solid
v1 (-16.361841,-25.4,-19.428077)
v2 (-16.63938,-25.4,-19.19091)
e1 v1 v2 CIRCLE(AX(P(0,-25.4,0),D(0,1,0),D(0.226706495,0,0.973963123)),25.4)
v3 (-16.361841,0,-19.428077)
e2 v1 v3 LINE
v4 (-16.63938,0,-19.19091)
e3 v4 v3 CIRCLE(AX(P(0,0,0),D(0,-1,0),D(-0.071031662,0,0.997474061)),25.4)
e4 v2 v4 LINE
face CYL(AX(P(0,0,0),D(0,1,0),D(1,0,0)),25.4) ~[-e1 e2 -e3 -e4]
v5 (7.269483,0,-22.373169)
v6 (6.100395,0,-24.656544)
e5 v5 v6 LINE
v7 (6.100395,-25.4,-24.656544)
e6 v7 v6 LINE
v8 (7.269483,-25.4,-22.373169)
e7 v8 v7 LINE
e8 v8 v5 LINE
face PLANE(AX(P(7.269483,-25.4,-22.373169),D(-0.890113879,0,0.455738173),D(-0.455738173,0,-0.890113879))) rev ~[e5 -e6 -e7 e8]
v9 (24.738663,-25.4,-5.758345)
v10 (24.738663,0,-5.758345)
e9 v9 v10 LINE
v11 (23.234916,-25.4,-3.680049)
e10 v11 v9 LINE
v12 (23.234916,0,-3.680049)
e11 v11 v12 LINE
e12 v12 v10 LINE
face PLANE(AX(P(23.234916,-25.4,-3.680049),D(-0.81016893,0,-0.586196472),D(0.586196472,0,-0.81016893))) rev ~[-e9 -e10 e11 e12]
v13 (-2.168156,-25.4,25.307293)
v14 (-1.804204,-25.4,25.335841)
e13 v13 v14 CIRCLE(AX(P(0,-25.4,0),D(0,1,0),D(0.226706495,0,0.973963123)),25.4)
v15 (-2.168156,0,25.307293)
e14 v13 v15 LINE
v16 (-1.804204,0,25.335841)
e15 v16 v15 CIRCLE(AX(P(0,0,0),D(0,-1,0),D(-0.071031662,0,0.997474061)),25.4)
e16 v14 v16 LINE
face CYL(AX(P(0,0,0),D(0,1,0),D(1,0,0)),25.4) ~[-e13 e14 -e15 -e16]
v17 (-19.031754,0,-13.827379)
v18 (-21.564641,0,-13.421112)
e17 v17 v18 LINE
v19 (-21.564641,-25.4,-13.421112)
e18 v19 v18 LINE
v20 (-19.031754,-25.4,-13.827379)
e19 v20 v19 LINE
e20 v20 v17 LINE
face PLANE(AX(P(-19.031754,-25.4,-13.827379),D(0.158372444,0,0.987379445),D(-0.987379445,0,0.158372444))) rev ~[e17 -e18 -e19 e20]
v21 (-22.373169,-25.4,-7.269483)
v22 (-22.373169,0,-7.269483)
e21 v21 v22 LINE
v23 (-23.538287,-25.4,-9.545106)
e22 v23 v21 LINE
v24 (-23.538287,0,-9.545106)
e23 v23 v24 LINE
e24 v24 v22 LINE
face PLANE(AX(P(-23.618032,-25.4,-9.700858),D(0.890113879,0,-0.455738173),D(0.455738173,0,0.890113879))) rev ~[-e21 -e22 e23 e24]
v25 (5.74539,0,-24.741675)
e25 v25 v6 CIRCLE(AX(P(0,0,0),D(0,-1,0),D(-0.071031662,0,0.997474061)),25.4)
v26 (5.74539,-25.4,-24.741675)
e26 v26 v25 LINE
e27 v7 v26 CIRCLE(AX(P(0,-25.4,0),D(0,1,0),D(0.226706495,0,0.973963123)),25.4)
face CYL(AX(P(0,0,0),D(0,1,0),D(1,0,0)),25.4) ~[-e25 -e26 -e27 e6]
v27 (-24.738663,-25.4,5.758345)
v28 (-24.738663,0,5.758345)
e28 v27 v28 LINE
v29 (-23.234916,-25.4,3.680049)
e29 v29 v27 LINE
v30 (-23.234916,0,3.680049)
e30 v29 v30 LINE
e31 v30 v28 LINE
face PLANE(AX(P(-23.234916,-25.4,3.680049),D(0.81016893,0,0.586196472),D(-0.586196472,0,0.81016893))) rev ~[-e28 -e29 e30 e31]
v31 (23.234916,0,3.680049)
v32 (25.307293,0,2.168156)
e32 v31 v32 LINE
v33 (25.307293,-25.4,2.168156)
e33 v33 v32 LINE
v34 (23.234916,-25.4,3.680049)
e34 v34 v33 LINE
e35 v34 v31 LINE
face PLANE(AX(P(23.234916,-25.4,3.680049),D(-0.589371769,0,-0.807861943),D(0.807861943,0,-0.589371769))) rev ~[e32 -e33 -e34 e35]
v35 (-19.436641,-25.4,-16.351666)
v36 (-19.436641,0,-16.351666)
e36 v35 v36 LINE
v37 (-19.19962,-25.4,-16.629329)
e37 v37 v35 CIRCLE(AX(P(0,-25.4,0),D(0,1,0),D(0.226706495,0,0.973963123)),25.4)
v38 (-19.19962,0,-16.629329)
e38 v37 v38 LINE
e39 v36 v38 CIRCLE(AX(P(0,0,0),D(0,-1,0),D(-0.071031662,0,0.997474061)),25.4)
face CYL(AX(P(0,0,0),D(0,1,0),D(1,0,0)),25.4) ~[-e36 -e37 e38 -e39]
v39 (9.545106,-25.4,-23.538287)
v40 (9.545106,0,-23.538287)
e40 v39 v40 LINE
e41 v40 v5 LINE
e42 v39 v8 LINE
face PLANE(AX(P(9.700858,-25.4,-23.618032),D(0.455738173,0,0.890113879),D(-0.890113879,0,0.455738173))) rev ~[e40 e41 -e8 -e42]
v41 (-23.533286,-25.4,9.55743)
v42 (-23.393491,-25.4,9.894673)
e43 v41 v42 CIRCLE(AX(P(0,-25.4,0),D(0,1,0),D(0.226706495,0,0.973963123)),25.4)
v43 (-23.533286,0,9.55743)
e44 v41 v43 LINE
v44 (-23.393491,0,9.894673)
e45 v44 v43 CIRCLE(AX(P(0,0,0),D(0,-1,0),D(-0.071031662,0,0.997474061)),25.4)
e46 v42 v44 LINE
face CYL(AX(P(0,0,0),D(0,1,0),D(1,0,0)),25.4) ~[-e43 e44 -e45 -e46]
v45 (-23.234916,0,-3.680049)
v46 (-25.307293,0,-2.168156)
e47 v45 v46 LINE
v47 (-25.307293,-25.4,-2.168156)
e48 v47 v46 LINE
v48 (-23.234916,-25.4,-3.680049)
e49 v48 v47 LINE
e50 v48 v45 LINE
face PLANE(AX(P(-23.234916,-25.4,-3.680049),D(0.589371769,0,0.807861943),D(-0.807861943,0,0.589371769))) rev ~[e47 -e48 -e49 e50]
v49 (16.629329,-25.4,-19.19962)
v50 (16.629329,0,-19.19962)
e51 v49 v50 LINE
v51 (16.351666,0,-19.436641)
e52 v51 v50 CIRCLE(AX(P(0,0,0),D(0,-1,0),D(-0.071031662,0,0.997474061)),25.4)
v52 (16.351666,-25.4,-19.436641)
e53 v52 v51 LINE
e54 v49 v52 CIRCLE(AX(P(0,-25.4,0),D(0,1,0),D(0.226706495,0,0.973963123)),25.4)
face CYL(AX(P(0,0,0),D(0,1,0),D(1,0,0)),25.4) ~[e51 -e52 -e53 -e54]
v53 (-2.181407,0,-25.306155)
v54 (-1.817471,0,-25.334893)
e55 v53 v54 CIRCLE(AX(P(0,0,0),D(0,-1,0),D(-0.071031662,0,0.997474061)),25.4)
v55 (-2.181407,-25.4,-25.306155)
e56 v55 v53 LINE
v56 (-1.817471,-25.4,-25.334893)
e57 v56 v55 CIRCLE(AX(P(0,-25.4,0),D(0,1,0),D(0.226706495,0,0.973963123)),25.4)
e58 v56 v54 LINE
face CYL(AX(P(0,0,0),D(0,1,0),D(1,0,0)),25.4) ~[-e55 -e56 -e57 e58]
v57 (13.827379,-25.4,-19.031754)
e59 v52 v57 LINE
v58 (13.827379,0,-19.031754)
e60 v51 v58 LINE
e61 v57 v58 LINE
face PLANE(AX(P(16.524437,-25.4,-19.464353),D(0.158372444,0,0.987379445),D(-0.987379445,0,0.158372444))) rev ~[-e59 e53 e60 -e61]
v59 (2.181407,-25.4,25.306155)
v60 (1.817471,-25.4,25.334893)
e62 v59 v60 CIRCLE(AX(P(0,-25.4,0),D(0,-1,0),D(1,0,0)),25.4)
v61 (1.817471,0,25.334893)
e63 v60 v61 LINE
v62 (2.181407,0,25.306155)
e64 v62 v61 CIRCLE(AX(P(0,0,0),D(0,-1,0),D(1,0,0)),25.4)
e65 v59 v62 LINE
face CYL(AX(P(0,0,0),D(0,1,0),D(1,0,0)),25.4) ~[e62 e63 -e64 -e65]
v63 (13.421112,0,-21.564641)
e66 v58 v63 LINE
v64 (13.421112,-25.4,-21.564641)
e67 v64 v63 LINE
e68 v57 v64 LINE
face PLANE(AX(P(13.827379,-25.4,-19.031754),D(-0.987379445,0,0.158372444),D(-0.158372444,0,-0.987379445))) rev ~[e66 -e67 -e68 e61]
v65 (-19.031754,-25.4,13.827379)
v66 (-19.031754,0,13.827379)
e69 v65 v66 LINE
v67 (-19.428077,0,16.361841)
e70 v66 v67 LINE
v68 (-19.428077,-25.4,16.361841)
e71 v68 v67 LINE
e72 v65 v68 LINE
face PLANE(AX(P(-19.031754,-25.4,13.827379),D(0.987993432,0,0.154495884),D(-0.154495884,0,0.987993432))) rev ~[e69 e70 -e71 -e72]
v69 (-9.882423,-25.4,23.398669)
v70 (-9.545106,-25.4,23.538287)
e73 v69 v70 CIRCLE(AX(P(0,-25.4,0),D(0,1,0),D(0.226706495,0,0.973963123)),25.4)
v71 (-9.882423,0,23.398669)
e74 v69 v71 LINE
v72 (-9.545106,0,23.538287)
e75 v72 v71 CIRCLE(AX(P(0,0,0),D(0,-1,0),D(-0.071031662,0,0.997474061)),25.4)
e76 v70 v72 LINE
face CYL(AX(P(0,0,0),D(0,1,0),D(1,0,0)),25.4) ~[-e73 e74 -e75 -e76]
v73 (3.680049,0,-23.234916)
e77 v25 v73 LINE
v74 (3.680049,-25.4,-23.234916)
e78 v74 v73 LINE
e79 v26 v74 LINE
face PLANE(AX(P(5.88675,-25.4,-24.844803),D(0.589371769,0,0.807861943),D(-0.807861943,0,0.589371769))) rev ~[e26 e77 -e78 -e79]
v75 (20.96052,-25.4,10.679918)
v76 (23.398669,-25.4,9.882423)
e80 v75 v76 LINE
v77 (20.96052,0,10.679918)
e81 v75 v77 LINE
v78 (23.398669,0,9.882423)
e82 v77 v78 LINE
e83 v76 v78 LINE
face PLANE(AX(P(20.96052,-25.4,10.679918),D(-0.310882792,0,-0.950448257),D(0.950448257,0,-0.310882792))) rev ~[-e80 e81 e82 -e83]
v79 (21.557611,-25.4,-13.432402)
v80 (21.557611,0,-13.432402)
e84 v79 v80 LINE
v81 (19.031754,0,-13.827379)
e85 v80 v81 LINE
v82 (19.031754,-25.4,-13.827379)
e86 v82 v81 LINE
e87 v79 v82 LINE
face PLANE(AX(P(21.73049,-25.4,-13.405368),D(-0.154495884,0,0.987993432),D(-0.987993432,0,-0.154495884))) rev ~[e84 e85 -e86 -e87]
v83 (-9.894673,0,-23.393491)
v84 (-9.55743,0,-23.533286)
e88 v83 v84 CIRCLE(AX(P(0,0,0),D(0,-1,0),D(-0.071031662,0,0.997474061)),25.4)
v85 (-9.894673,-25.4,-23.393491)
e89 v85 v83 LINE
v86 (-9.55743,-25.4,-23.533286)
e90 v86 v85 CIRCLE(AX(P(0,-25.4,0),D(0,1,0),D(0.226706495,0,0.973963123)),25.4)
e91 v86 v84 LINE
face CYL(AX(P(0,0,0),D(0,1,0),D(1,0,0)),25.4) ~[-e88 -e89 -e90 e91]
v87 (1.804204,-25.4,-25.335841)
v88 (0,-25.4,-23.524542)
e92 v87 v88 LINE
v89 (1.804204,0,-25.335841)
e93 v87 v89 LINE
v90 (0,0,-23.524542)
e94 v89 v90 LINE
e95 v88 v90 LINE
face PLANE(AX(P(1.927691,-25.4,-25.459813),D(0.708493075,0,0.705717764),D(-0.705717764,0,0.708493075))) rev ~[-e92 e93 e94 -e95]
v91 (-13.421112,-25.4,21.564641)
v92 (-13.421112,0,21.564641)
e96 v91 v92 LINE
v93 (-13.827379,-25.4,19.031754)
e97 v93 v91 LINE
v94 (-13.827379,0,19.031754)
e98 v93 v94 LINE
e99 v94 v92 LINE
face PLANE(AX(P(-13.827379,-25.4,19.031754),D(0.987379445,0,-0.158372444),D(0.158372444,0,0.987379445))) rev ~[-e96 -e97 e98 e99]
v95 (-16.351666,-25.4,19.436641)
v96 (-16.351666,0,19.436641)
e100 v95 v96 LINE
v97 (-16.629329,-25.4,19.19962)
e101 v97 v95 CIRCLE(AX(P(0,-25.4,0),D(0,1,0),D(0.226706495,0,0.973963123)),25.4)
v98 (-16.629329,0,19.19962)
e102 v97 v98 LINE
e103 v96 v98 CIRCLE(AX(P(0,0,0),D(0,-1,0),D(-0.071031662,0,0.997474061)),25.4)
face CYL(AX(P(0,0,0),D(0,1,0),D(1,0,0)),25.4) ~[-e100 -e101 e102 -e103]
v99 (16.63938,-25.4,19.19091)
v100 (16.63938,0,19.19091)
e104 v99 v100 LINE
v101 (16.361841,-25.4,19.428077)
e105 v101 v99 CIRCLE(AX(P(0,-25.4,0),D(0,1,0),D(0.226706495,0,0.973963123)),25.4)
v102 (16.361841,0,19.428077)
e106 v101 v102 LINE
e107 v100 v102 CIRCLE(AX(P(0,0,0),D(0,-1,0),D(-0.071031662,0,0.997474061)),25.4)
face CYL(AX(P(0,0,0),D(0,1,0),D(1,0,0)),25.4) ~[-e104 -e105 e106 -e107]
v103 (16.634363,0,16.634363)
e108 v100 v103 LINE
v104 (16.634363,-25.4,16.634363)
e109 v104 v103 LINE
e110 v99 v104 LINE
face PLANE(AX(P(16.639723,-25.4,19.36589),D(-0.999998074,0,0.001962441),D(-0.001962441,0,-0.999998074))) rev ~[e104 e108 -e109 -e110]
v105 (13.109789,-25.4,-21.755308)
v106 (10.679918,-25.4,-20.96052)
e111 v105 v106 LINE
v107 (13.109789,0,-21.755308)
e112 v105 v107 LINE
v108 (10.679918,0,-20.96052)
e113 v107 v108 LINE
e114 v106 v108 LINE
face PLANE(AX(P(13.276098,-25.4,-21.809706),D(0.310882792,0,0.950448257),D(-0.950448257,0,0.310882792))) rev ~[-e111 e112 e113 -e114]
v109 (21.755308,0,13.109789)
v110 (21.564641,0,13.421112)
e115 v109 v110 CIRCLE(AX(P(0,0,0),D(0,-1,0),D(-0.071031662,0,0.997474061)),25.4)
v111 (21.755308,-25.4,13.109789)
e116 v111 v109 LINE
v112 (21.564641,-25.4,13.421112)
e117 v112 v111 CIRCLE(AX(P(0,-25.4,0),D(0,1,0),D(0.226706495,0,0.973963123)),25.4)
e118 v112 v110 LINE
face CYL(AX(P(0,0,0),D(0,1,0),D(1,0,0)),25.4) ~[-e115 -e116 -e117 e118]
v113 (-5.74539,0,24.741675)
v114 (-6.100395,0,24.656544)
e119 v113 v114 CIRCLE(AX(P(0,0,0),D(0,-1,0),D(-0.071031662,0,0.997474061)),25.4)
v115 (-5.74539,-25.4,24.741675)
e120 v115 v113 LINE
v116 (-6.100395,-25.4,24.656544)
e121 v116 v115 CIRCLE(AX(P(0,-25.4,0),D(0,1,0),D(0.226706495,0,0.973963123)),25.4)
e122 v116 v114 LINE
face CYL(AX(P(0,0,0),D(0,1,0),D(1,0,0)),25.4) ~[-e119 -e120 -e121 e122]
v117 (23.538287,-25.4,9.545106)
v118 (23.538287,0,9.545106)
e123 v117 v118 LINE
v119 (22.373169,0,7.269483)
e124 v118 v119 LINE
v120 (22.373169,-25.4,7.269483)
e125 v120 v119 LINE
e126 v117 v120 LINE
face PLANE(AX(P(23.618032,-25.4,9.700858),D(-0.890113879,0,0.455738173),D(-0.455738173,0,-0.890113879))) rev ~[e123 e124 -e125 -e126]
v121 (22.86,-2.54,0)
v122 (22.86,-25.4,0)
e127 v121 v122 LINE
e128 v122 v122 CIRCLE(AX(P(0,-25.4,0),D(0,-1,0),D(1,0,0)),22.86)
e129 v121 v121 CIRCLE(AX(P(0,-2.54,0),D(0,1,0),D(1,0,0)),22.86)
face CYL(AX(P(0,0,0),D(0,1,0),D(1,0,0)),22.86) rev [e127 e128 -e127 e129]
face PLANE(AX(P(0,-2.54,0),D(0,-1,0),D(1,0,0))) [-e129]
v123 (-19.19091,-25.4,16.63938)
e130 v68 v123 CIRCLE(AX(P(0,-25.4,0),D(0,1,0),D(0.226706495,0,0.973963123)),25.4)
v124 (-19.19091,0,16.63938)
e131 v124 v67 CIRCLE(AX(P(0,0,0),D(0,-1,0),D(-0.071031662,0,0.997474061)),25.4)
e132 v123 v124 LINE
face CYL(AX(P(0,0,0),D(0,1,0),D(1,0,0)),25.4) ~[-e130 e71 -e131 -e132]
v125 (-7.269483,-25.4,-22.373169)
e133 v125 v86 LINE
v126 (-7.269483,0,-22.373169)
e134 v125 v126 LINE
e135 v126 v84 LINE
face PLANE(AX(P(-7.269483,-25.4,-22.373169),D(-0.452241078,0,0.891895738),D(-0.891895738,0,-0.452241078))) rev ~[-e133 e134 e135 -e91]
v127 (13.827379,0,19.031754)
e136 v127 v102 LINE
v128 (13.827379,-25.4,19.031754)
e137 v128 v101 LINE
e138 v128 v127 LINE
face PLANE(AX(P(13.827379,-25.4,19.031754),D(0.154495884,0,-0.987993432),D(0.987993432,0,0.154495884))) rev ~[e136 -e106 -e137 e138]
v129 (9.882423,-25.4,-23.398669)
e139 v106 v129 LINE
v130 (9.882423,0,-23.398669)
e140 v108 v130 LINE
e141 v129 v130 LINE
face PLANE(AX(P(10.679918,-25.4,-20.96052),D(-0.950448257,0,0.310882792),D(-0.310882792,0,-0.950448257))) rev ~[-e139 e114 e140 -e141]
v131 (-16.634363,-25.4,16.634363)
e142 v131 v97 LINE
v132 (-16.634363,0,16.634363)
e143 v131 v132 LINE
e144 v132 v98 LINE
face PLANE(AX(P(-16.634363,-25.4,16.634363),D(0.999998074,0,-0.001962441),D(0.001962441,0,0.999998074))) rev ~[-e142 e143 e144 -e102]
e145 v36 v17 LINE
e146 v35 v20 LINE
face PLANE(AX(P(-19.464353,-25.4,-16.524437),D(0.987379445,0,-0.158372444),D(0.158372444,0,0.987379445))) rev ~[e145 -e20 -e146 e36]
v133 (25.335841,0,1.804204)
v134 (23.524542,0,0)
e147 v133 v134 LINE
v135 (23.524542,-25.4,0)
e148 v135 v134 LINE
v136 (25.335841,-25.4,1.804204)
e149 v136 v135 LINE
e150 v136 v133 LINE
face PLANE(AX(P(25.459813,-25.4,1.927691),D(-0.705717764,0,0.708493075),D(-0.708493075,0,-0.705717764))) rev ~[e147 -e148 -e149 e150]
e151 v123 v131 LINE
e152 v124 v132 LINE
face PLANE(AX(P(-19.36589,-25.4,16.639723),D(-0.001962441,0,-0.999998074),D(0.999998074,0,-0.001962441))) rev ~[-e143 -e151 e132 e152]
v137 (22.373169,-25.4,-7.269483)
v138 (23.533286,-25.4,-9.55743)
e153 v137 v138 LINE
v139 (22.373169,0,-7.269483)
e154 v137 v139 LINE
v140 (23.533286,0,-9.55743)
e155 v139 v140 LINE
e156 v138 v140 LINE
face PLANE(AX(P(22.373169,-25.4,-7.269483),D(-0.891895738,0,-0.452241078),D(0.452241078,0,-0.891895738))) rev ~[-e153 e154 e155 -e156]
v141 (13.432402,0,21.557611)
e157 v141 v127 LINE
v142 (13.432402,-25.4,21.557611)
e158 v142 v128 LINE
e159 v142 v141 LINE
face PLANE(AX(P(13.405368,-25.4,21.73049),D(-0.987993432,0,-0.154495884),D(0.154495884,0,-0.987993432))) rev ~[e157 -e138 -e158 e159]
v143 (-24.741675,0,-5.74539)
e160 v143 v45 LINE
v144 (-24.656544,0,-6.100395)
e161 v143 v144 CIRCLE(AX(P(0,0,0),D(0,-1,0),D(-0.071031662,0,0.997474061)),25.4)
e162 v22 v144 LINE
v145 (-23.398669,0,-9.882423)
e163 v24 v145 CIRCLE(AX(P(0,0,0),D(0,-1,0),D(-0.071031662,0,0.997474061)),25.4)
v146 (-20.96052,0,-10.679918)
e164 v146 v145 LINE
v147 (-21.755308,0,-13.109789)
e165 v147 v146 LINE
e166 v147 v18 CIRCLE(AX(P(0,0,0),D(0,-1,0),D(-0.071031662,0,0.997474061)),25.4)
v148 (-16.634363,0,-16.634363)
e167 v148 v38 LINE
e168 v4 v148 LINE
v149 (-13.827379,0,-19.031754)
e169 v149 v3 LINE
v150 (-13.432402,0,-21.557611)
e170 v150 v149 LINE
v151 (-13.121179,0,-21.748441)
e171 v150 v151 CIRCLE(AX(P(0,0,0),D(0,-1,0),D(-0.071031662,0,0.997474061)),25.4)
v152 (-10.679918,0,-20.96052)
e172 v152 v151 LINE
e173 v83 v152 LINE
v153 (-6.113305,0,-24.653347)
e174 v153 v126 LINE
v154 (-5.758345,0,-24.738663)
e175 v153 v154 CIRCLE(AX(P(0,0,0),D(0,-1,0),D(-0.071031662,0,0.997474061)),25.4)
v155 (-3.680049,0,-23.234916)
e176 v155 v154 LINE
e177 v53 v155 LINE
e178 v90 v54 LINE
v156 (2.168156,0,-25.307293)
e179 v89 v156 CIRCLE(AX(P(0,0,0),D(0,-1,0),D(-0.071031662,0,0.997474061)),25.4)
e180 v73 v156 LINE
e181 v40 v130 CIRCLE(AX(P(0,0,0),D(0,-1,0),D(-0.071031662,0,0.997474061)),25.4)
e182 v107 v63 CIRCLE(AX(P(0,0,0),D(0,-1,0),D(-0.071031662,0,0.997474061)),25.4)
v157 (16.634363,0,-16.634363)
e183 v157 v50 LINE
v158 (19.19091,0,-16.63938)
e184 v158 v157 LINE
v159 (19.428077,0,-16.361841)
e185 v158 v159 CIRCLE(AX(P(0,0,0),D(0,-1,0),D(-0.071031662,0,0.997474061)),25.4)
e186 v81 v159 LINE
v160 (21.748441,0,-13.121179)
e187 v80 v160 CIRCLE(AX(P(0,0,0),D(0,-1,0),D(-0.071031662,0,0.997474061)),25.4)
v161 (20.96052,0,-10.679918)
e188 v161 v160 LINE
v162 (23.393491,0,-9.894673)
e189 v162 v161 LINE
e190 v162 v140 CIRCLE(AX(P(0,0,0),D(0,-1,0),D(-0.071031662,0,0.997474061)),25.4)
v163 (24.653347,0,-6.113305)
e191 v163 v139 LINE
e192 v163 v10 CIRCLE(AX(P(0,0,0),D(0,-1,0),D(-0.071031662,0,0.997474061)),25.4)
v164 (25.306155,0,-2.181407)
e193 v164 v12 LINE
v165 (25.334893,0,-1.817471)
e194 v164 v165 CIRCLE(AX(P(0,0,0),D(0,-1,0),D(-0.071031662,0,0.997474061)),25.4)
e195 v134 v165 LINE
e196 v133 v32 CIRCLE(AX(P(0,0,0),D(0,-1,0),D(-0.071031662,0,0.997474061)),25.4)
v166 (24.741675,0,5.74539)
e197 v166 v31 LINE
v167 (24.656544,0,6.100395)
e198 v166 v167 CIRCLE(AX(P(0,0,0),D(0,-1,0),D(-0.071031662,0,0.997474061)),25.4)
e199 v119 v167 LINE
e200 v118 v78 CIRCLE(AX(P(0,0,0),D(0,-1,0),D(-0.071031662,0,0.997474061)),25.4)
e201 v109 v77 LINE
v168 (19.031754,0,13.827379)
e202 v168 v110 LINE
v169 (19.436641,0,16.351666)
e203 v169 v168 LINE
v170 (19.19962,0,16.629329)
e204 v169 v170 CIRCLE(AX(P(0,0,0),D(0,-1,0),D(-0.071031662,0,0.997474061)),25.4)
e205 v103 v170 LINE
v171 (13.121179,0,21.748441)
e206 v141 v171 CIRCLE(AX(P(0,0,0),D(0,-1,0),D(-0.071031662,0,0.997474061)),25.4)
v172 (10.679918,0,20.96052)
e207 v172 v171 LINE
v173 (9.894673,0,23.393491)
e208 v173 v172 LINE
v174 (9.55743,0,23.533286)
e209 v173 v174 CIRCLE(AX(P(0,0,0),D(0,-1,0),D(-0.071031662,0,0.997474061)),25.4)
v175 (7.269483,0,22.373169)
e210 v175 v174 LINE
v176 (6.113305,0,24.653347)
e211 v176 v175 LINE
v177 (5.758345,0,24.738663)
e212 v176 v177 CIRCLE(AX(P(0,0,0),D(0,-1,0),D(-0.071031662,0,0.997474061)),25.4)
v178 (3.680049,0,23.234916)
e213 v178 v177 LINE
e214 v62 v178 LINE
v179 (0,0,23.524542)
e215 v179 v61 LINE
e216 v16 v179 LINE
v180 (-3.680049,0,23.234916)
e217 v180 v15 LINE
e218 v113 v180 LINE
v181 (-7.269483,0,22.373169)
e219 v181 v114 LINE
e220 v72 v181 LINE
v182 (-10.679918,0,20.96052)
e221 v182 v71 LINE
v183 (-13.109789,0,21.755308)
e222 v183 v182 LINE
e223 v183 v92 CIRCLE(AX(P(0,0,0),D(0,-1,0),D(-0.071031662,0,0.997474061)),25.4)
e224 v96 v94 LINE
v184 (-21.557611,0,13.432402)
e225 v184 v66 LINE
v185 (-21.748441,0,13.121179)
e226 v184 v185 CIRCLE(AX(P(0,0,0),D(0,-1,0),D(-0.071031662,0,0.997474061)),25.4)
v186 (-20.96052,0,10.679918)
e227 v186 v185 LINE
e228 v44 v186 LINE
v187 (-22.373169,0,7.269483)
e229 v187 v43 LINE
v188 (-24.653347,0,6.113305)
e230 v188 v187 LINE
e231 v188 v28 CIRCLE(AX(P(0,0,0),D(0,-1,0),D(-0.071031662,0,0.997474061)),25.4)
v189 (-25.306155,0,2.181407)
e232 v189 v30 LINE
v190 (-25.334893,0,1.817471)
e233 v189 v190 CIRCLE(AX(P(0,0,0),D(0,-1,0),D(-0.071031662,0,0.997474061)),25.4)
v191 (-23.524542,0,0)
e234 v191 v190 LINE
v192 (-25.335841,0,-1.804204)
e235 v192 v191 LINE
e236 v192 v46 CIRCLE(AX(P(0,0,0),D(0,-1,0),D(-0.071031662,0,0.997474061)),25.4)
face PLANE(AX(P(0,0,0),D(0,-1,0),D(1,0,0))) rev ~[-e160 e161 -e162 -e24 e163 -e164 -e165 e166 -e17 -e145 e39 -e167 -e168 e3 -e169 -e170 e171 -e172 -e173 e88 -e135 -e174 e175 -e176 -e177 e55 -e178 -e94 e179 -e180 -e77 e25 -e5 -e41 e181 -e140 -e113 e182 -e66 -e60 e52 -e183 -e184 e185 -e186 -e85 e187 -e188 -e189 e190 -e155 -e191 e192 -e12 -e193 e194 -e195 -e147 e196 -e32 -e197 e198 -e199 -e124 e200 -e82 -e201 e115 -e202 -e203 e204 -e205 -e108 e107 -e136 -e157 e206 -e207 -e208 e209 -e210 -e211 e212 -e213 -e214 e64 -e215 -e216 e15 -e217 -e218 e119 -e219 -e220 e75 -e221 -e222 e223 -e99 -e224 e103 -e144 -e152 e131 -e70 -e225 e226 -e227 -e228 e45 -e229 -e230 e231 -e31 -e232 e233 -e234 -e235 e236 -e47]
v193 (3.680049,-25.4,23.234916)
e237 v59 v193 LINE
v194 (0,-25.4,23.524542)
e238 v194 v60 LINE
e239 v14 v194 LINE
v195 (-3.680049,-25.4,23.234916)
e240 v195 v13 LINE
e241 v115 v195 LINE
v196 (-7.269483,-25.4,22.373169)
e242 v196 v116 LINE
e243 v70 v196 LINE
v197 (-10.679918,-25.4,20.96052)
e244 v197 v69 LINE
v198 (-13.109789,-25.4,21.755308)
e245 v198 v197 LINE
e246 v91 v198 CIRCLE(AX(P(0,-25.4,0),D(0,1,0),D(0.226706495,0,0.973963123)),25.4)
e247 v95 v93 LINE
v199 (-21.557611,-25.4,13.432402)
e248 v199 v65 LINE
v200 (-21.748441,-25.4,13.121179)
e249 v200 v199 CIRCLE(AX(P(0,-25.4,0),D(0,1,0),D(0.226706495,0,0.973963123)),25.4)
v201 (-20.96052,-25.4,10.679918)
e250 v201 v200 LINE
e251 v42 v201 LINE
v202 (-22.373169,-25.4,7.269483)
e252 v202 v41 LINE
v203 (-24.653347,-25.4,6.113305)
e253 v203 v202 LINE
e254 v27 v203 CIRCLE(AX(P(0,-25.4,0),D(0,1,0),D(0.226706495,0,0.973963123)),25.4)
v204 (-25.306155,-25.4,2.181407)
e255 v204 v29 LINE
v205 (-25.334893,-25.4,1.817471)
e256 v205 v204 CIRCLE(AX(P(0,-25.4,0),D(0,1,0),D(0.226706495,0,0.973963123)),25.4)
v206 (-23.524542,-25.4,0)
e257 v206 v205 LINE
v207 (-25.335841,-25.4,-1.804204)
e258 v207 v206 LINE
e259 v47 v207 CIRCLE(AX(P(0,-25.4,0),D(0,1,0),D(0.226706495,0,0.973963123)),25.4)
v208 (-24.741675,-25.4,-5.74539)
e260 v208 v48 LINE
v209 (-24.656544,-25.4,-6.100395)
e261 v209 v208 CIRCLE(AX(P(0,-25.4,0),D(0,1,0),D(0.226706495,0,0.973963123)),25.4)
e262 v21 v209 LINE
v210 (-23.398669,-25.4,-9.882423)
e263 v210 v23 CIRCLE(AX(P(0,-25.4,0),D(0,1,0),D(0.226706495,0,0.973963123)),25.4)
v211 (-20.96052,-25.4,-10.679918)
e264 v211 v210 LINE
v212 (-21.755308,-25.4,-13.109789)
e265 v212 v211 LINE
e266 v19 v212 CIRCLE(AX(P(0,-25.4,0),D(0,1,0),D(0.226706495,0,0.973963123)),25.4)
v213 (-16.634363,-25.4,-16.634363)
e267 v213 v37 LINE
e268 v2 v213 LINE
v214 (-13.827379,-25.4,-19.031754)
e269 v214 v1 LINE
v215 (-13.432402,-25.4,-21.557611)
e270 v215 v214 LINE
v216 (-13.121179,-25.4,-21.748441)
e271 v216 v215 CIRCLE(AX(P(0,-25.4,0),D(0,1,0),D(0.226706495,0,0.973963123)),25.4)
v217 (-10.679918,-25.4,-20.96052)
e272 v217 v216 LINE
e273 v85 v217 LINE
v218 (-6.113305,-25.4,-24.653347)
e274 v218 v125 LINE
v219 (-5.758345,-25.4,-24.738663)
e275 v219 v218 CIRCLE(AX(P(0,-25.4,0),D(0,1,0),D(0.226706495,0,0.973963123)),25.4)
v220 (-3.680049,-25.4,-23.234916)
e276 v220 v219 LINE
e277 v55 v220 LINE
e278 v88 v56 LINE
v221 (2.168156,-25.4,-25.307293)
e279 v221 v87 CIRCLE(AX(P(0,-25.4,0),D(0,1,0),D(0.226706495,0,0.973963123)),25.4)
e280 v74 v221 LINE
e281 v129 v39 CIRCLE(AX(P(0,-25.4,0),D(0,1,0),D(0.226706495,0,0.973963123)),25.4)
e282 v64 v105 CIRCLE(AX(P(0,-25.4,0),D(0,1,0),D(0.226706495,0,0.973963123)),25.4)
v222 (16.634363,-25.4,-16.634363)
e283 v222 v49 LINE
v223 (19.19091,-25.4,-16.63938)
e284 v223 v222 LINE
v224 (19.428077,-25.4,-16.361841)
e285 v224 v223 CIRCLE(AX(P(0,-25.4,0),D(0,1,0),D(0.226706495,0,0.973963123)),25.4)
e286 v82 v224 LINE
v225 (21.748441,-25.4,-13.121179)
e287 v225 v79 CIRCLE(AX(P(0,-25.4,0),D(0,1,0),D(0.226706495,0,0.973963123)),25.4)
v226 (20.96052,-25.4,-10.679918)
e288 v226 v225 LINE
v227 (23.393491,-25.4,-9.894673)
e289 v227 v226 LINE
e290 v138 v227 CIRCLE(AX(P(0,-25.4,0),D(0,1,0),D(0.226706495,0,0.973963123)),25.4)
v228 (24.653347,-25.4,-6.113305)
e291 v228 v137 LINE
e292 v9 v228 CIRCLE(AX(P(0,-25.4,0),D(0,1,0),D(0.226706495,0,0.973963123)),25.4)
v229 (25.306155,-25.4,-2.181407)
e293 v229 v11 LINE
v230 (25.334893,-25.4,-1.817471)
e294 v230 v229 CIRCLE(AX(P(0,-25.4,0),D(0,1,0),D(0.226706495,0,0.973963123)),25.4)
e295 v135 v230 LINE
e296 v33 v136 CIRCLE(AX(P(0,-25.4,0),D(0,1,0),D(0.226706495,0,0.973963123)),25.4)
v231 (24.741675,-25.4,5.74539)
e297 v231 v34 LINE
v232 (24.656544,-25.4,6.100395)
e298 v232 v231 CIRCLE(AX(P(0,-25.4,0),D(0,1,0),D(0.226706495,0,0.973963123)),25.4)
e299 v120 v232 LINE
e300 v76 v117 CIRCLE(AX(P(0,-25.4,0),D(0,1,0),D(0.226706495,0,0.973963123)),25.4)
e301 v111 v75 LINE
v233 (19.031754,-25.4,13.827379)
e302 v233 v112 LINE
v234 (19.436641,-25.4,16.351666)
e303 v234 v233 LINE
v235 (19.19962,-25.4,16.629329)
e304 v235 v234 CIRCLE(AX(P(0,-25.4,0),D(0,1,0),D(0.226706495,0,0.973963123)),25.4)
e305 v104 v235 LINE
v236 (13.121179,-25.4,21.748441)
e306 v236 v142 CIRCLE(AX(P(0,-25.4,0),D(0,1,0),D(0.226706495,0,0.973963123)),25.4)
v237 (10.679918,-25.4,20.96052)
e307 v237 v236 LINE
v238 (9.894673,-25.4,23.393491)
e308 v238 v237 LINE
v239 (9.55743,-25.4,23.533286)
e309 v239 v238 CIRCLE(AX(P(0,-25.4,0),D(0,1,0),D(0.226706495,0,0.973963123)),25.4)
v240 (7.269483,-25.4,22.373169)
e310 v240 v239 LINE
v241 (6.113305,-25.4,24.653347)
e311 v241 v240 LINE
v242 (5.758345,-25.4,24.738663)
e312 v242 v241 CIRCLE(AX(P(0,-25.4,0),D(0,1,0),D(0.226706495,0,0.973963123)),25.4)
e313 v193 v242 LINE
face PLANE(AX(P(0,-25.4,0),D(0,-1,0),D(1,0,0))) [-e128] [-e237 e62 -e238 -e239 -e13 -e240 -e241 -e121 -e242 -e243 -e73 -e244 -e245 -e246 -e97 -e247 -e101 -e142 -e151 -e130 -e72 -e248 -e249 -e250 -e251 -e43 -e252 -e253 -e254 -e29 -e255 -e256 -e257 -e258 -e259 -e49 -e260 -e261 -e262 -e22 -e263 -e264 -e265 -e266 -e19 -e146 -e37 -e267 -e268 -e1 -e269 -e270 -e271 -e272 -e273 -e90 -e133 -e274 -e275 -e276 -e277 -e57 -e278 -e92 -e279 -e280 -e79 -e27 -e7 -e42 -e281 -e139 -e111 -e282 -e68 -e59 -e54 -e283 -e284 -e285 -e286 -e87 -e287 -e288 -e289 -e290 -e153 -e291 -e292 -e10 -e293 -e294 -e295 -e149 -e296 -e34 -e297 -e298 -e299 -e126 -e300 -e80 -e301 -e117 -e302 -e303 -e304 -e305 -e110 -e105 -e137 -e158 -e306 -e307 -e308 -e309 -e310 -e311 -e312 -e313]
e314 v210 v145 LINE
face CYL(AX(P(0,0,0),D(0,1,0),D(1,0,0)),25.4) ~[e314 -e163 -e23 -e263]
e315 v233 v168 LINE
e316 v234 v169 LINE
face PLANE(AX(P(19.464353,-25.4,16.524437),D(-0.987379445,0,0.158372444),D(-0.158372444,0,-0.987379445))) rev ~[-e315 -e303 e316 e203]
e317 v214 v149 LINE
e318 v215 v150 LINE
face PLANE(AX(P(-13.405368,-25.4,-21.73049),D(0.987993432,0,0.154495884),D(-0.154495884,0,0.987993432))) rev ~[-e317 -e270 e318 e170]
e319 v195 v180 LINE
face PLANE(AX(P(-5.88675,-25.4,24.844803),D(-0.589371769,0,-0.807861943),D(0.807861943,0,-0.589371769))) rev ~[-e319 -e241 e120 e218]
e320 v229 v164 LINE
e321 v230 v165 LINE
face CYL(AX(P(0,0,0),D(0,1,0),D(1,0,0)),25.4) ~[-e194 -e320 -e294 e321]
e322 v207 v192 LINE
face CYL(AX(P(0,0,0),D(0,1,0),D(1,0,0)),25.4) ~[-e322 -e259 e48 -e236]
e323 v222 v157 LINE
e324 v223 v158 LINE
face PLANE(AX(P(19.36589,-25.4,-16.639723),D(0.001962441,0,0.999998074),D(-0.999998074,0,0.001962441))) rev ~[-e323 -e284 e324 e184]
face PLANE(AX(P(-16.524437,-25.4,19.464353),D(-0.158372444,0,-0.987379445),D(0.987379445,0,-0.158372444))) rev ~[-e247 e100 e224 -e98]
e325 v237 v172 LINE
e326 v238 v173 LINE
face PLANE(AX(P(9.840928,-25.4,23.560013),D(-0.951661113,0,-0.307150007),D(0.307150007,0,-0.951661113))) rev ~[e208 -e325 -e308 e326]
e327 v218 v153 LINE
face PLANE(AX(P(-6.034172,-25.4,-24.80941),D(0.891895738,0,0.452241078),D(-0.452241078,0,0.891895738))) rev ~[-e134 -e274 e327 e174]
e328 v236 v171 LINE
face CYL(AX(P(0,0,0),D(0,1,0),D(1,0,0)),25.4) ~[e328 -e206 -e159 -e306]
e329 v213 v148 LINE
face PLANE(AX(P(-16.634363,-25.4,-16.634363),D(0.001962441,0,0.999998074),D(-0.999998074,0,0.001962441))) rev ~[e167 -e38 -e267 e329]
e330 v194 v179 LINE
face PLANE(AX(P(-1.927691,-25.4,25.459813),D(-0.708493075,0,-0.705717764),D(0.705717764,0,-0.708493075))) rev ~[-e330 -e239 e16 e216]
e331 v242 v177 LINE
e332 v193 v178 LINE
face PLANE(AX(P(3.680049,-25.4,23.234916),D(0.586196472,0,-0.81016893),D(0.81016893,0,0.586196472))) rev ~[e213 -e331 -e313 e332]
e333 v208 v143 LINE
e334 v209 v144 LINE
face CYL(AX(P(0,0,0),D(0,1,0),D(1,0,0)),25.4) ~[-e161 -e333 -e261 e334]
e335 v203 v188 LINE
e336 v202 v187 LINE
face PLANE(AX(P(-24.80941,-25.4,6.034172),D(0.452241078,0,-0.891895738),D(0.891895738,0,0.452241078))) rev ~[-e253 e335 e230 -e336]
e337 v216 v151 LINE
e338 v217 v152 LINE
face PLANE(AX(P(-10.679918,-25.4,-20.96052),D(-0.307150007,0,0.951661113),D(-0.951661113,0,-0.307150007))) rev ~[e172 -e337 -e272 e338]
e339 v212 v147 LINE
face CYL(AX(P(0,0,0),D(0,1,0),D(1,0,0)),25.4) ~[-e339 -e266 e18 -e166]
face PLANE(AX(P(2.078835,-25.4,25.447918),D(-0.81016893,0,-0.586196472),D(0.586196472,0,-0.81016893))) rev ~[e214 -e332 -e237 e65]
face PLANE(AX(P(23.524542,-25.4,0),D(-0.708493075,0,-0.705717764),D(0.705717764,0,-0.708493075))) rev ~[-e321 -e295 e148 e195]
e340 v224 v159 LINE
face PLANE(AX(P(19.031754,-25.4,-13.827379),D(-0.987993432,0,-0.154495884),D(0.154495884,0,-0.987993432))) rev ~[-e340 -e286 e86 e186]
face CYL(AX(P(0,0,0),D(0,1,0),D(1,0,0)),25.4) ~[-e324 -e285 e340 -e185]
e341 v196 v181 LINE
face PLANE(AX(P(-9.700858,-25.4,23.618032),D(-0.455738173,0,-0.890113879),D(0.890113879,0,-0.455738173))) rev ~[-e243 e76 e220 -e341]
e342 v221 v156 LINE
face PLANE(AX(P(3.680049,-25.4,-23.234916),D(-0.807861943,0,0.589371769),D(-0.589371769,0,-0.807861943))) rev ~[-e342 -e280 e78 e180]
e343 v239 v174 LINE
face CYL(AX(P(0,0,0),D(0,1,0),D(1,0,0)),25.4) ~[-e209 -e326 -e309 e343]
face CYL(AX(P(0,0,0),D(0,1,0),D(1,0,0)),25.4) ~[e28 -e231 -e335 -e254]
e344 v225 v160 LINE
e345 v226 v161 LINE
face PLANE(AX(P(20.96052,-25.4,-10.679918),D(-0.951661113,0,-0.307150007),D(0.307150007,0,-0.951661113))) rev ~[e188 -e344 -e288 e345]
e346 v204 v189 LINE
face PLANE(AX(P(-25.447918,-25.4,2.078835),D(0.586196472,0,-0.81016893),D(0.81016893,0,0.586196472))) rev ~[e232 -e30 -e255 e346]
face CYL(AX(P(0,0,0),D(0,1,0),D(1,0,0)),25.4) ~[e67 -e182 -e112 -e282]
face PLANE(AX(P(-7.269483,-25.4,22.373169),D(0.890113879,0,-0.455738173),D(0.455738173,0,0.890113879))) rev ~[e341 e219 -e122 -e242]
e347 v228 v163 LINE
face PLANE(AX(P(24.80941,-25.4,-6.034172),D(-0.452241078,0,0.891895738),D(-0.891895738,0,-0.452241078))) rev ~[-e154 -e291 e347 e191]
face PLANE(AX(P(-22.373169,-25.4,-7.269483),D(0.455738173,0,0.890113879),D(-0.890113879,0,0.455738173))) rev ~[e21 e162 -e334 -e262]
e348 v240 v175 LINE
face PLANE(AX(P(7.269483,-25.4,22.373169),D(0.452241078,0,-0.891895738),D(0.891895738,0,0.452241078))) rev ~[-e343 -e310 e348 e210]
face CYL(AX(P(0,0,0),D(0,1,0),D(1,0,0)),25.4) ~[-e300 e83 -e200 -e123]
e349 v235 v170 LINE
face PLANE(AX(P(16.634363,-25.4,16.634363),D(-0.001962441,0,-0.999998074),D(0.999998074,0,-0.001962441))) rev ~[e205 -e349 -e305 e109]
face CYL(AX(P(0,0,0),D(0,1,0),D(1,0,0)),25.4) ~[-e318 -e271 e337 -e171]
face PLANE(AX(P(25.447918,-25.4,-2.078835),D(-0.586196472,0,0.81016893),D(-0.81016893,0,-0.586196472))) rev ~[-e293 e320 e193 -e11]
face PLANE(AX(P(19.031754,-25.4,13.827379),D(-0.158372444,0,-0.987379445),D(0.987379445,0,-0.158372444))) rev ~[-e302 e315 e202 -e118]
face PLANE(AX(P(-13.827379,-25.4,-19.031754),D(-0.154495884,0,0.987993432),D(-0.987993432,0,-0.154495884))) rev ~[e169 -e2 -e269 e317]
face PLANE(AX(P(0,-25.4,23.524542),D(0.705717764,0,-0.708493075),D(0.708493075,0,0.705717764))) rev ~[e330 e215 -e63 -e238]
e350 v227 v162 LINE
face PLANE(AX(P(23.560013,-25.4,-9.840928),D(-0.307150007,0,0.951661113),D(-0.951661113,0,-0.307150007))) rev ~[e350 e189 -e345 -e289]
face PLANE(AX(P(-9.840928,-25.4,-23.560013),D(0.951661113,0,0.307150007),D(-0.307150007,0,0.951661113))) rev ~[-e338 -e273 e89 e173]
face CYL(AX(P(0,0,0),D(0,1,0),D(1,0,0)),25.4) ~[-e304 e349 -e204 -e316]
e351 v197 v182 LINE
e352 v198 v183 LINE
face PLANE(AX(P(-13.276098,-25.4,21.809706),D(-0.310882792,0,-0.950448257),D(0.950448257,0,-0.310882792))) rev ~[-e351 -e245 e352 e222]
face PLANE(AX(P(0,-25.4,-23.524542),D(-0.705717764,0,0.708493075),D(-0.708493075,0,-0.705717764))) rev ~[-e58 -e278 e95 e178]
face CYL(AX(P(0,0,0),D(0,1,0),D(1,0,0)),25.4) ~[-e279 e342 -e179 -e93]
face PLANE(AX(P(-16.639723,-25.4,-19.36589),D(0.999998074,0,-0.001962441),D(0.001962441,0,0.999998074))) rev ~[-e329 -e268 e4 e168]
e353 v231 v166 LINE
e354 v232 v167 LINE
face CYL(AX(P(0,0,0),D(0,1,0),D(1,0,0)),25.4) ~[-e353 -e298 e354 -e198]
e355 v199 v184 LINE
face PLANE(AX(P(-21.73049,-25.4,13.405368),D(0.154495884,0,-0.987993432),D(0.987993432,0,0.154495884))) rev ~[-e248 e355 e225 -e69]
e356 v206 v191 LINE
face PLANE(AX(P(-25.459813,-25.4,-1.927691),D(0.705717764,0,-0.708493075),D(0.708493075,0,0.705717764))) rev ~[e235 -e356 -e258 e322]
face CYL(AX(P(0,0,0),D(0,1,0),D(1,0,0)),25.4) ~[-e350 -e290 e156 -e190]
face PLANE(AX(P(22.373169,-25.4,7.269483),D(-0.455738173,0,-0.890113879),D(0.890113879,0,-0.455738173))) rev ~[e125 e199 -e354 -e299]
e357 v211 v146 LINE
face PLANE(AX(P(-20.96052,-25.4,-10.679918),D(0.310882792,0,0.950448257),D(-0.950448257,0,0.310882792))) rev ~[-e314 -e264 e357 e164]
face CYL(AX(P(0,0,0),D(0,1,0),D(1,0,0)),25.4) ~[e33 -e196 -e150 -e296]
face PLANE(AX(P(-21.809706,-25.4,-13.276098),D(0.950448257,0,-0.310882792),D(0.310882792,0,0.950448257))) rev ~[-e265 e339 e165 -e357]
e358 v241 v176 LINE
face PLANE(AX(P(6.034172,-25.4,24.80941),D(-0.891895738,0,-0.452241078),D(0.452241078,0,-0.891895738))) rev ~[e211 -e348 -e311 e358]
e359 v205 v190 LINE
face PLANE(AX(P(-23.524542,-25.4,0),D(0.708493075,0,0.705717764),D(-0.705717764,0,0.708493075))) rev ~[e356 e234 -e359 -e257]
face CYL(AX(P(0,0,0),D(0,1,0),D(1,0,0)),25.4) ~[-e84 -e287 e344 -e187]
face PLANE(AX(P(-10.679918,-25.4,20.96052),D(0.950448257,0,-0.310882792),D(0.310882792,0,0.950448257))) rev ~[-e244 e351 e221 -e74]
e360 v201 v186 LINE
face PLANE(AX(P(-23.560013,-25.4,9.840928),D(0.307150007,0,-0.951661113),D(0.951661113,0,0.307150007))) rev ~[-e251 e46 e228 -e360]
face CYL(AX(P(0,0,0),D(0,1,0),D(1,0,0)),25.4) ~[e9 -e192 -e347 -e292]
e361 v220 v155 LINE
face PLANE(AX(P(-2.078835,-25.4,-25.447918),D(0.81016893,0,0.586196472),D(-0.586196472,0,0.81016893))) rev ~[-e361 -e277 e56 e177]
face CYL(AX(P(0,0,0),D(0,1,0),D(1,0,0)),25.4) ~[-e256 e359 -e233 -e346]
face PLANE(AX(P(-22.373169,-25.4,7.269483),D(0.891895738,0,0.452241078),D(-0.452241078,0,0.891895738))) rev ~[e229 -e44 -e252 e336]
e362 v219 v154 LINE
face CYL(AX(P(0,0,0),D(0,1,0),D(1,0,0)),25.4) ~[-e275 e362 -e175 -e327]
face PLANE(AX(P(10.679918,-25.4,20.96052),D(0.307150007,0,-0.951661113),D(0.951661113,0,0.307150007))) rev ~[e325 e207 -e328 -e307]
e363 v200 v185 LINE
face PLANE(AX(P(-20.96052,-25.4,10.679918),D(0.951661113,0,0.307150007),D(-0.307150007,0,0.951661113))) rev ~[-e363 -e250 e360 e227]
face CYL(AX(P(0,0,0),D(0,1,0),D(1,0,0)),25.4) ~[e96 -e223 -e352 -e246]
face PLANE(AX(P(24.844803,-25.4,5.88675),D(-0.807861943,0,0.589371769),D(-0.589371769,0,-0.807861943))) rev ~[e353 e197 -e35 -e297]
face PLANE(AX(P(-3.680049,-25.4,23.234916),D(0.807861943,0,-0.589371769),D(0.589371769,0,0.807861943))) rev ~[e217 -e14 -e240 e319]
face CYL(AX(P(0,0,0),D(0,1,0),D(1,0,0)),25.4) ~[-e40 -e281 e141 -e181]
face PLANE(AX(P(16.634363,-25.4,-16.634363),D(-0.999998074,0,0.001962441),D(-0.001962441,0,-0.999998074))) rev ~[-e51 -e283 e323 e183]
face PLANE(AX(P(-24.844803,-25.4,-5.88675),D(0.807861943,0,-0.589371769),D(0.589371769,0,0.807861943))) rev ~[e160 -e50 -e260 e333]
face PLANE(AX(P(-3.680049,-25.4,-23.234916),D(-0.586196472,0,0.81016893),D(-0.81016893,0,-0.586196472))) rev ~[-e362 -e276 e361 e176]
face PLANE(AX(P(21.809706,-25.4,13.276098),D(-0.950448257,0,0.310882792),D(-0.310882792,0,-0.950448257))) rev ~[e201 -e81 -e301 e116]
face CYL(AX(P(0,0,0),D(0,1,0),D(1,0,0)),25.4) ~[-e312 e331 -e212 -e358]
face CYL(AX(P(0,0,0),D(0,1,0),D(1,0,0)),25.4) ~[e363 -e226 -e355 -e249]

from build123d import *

# Parameters (mm, degrees)
F0_R            = 25.4
F1_DEPTH        = 25.4
F2_T            = -2.54
F6_DEPTH        = 25.4
F6_COPIES_COUNT = 40


# Not quite as in the source:
# - a pattern or mirror of a feature is missing from the dataset's text; its kind, count and spacing are read off the source's solid
# - a feature names something its author has since deleted; it is built from what else it names


with BuildPart() as f1:
    # F0 (on Front) → F1 (new body)
    with BuildSketch(Plane.XZ):
        Circle(F0_R)
    extrude(amount=F1_DEPTH)

    # F2
    f2_openings = [f1.faces().sort_by_distance(p)[0] for p in [
        (0, -25.4, 0),
    ]]
    offset(amount=F2_T, openings=f2_openings)

    # F4 (on offset) → F6 (cut)
    with BuildSketch(Plane.XZ.offset(25.4)):
        Polygon((1.9352714298, 25.4522323095), (-1.9276905805, 25.4598131588), (0, 23.524541729), align=None)
    f6 = extrude(amount=-F6_DEPTH, mode=Mode.SUBTRACT)

    # F6_copies: F6 ×40 about axis
    f6_copies_axis = Axis((0, 0, 0), (0, 1, 0))
    for i in range(1, F6_COPIES_COUNT):
        add(f6.rotate(f6_copies_axis, i * 360 / F6_COPIES_COUNT), mode=Mode.SUBTRACT)


solid = f1.part
